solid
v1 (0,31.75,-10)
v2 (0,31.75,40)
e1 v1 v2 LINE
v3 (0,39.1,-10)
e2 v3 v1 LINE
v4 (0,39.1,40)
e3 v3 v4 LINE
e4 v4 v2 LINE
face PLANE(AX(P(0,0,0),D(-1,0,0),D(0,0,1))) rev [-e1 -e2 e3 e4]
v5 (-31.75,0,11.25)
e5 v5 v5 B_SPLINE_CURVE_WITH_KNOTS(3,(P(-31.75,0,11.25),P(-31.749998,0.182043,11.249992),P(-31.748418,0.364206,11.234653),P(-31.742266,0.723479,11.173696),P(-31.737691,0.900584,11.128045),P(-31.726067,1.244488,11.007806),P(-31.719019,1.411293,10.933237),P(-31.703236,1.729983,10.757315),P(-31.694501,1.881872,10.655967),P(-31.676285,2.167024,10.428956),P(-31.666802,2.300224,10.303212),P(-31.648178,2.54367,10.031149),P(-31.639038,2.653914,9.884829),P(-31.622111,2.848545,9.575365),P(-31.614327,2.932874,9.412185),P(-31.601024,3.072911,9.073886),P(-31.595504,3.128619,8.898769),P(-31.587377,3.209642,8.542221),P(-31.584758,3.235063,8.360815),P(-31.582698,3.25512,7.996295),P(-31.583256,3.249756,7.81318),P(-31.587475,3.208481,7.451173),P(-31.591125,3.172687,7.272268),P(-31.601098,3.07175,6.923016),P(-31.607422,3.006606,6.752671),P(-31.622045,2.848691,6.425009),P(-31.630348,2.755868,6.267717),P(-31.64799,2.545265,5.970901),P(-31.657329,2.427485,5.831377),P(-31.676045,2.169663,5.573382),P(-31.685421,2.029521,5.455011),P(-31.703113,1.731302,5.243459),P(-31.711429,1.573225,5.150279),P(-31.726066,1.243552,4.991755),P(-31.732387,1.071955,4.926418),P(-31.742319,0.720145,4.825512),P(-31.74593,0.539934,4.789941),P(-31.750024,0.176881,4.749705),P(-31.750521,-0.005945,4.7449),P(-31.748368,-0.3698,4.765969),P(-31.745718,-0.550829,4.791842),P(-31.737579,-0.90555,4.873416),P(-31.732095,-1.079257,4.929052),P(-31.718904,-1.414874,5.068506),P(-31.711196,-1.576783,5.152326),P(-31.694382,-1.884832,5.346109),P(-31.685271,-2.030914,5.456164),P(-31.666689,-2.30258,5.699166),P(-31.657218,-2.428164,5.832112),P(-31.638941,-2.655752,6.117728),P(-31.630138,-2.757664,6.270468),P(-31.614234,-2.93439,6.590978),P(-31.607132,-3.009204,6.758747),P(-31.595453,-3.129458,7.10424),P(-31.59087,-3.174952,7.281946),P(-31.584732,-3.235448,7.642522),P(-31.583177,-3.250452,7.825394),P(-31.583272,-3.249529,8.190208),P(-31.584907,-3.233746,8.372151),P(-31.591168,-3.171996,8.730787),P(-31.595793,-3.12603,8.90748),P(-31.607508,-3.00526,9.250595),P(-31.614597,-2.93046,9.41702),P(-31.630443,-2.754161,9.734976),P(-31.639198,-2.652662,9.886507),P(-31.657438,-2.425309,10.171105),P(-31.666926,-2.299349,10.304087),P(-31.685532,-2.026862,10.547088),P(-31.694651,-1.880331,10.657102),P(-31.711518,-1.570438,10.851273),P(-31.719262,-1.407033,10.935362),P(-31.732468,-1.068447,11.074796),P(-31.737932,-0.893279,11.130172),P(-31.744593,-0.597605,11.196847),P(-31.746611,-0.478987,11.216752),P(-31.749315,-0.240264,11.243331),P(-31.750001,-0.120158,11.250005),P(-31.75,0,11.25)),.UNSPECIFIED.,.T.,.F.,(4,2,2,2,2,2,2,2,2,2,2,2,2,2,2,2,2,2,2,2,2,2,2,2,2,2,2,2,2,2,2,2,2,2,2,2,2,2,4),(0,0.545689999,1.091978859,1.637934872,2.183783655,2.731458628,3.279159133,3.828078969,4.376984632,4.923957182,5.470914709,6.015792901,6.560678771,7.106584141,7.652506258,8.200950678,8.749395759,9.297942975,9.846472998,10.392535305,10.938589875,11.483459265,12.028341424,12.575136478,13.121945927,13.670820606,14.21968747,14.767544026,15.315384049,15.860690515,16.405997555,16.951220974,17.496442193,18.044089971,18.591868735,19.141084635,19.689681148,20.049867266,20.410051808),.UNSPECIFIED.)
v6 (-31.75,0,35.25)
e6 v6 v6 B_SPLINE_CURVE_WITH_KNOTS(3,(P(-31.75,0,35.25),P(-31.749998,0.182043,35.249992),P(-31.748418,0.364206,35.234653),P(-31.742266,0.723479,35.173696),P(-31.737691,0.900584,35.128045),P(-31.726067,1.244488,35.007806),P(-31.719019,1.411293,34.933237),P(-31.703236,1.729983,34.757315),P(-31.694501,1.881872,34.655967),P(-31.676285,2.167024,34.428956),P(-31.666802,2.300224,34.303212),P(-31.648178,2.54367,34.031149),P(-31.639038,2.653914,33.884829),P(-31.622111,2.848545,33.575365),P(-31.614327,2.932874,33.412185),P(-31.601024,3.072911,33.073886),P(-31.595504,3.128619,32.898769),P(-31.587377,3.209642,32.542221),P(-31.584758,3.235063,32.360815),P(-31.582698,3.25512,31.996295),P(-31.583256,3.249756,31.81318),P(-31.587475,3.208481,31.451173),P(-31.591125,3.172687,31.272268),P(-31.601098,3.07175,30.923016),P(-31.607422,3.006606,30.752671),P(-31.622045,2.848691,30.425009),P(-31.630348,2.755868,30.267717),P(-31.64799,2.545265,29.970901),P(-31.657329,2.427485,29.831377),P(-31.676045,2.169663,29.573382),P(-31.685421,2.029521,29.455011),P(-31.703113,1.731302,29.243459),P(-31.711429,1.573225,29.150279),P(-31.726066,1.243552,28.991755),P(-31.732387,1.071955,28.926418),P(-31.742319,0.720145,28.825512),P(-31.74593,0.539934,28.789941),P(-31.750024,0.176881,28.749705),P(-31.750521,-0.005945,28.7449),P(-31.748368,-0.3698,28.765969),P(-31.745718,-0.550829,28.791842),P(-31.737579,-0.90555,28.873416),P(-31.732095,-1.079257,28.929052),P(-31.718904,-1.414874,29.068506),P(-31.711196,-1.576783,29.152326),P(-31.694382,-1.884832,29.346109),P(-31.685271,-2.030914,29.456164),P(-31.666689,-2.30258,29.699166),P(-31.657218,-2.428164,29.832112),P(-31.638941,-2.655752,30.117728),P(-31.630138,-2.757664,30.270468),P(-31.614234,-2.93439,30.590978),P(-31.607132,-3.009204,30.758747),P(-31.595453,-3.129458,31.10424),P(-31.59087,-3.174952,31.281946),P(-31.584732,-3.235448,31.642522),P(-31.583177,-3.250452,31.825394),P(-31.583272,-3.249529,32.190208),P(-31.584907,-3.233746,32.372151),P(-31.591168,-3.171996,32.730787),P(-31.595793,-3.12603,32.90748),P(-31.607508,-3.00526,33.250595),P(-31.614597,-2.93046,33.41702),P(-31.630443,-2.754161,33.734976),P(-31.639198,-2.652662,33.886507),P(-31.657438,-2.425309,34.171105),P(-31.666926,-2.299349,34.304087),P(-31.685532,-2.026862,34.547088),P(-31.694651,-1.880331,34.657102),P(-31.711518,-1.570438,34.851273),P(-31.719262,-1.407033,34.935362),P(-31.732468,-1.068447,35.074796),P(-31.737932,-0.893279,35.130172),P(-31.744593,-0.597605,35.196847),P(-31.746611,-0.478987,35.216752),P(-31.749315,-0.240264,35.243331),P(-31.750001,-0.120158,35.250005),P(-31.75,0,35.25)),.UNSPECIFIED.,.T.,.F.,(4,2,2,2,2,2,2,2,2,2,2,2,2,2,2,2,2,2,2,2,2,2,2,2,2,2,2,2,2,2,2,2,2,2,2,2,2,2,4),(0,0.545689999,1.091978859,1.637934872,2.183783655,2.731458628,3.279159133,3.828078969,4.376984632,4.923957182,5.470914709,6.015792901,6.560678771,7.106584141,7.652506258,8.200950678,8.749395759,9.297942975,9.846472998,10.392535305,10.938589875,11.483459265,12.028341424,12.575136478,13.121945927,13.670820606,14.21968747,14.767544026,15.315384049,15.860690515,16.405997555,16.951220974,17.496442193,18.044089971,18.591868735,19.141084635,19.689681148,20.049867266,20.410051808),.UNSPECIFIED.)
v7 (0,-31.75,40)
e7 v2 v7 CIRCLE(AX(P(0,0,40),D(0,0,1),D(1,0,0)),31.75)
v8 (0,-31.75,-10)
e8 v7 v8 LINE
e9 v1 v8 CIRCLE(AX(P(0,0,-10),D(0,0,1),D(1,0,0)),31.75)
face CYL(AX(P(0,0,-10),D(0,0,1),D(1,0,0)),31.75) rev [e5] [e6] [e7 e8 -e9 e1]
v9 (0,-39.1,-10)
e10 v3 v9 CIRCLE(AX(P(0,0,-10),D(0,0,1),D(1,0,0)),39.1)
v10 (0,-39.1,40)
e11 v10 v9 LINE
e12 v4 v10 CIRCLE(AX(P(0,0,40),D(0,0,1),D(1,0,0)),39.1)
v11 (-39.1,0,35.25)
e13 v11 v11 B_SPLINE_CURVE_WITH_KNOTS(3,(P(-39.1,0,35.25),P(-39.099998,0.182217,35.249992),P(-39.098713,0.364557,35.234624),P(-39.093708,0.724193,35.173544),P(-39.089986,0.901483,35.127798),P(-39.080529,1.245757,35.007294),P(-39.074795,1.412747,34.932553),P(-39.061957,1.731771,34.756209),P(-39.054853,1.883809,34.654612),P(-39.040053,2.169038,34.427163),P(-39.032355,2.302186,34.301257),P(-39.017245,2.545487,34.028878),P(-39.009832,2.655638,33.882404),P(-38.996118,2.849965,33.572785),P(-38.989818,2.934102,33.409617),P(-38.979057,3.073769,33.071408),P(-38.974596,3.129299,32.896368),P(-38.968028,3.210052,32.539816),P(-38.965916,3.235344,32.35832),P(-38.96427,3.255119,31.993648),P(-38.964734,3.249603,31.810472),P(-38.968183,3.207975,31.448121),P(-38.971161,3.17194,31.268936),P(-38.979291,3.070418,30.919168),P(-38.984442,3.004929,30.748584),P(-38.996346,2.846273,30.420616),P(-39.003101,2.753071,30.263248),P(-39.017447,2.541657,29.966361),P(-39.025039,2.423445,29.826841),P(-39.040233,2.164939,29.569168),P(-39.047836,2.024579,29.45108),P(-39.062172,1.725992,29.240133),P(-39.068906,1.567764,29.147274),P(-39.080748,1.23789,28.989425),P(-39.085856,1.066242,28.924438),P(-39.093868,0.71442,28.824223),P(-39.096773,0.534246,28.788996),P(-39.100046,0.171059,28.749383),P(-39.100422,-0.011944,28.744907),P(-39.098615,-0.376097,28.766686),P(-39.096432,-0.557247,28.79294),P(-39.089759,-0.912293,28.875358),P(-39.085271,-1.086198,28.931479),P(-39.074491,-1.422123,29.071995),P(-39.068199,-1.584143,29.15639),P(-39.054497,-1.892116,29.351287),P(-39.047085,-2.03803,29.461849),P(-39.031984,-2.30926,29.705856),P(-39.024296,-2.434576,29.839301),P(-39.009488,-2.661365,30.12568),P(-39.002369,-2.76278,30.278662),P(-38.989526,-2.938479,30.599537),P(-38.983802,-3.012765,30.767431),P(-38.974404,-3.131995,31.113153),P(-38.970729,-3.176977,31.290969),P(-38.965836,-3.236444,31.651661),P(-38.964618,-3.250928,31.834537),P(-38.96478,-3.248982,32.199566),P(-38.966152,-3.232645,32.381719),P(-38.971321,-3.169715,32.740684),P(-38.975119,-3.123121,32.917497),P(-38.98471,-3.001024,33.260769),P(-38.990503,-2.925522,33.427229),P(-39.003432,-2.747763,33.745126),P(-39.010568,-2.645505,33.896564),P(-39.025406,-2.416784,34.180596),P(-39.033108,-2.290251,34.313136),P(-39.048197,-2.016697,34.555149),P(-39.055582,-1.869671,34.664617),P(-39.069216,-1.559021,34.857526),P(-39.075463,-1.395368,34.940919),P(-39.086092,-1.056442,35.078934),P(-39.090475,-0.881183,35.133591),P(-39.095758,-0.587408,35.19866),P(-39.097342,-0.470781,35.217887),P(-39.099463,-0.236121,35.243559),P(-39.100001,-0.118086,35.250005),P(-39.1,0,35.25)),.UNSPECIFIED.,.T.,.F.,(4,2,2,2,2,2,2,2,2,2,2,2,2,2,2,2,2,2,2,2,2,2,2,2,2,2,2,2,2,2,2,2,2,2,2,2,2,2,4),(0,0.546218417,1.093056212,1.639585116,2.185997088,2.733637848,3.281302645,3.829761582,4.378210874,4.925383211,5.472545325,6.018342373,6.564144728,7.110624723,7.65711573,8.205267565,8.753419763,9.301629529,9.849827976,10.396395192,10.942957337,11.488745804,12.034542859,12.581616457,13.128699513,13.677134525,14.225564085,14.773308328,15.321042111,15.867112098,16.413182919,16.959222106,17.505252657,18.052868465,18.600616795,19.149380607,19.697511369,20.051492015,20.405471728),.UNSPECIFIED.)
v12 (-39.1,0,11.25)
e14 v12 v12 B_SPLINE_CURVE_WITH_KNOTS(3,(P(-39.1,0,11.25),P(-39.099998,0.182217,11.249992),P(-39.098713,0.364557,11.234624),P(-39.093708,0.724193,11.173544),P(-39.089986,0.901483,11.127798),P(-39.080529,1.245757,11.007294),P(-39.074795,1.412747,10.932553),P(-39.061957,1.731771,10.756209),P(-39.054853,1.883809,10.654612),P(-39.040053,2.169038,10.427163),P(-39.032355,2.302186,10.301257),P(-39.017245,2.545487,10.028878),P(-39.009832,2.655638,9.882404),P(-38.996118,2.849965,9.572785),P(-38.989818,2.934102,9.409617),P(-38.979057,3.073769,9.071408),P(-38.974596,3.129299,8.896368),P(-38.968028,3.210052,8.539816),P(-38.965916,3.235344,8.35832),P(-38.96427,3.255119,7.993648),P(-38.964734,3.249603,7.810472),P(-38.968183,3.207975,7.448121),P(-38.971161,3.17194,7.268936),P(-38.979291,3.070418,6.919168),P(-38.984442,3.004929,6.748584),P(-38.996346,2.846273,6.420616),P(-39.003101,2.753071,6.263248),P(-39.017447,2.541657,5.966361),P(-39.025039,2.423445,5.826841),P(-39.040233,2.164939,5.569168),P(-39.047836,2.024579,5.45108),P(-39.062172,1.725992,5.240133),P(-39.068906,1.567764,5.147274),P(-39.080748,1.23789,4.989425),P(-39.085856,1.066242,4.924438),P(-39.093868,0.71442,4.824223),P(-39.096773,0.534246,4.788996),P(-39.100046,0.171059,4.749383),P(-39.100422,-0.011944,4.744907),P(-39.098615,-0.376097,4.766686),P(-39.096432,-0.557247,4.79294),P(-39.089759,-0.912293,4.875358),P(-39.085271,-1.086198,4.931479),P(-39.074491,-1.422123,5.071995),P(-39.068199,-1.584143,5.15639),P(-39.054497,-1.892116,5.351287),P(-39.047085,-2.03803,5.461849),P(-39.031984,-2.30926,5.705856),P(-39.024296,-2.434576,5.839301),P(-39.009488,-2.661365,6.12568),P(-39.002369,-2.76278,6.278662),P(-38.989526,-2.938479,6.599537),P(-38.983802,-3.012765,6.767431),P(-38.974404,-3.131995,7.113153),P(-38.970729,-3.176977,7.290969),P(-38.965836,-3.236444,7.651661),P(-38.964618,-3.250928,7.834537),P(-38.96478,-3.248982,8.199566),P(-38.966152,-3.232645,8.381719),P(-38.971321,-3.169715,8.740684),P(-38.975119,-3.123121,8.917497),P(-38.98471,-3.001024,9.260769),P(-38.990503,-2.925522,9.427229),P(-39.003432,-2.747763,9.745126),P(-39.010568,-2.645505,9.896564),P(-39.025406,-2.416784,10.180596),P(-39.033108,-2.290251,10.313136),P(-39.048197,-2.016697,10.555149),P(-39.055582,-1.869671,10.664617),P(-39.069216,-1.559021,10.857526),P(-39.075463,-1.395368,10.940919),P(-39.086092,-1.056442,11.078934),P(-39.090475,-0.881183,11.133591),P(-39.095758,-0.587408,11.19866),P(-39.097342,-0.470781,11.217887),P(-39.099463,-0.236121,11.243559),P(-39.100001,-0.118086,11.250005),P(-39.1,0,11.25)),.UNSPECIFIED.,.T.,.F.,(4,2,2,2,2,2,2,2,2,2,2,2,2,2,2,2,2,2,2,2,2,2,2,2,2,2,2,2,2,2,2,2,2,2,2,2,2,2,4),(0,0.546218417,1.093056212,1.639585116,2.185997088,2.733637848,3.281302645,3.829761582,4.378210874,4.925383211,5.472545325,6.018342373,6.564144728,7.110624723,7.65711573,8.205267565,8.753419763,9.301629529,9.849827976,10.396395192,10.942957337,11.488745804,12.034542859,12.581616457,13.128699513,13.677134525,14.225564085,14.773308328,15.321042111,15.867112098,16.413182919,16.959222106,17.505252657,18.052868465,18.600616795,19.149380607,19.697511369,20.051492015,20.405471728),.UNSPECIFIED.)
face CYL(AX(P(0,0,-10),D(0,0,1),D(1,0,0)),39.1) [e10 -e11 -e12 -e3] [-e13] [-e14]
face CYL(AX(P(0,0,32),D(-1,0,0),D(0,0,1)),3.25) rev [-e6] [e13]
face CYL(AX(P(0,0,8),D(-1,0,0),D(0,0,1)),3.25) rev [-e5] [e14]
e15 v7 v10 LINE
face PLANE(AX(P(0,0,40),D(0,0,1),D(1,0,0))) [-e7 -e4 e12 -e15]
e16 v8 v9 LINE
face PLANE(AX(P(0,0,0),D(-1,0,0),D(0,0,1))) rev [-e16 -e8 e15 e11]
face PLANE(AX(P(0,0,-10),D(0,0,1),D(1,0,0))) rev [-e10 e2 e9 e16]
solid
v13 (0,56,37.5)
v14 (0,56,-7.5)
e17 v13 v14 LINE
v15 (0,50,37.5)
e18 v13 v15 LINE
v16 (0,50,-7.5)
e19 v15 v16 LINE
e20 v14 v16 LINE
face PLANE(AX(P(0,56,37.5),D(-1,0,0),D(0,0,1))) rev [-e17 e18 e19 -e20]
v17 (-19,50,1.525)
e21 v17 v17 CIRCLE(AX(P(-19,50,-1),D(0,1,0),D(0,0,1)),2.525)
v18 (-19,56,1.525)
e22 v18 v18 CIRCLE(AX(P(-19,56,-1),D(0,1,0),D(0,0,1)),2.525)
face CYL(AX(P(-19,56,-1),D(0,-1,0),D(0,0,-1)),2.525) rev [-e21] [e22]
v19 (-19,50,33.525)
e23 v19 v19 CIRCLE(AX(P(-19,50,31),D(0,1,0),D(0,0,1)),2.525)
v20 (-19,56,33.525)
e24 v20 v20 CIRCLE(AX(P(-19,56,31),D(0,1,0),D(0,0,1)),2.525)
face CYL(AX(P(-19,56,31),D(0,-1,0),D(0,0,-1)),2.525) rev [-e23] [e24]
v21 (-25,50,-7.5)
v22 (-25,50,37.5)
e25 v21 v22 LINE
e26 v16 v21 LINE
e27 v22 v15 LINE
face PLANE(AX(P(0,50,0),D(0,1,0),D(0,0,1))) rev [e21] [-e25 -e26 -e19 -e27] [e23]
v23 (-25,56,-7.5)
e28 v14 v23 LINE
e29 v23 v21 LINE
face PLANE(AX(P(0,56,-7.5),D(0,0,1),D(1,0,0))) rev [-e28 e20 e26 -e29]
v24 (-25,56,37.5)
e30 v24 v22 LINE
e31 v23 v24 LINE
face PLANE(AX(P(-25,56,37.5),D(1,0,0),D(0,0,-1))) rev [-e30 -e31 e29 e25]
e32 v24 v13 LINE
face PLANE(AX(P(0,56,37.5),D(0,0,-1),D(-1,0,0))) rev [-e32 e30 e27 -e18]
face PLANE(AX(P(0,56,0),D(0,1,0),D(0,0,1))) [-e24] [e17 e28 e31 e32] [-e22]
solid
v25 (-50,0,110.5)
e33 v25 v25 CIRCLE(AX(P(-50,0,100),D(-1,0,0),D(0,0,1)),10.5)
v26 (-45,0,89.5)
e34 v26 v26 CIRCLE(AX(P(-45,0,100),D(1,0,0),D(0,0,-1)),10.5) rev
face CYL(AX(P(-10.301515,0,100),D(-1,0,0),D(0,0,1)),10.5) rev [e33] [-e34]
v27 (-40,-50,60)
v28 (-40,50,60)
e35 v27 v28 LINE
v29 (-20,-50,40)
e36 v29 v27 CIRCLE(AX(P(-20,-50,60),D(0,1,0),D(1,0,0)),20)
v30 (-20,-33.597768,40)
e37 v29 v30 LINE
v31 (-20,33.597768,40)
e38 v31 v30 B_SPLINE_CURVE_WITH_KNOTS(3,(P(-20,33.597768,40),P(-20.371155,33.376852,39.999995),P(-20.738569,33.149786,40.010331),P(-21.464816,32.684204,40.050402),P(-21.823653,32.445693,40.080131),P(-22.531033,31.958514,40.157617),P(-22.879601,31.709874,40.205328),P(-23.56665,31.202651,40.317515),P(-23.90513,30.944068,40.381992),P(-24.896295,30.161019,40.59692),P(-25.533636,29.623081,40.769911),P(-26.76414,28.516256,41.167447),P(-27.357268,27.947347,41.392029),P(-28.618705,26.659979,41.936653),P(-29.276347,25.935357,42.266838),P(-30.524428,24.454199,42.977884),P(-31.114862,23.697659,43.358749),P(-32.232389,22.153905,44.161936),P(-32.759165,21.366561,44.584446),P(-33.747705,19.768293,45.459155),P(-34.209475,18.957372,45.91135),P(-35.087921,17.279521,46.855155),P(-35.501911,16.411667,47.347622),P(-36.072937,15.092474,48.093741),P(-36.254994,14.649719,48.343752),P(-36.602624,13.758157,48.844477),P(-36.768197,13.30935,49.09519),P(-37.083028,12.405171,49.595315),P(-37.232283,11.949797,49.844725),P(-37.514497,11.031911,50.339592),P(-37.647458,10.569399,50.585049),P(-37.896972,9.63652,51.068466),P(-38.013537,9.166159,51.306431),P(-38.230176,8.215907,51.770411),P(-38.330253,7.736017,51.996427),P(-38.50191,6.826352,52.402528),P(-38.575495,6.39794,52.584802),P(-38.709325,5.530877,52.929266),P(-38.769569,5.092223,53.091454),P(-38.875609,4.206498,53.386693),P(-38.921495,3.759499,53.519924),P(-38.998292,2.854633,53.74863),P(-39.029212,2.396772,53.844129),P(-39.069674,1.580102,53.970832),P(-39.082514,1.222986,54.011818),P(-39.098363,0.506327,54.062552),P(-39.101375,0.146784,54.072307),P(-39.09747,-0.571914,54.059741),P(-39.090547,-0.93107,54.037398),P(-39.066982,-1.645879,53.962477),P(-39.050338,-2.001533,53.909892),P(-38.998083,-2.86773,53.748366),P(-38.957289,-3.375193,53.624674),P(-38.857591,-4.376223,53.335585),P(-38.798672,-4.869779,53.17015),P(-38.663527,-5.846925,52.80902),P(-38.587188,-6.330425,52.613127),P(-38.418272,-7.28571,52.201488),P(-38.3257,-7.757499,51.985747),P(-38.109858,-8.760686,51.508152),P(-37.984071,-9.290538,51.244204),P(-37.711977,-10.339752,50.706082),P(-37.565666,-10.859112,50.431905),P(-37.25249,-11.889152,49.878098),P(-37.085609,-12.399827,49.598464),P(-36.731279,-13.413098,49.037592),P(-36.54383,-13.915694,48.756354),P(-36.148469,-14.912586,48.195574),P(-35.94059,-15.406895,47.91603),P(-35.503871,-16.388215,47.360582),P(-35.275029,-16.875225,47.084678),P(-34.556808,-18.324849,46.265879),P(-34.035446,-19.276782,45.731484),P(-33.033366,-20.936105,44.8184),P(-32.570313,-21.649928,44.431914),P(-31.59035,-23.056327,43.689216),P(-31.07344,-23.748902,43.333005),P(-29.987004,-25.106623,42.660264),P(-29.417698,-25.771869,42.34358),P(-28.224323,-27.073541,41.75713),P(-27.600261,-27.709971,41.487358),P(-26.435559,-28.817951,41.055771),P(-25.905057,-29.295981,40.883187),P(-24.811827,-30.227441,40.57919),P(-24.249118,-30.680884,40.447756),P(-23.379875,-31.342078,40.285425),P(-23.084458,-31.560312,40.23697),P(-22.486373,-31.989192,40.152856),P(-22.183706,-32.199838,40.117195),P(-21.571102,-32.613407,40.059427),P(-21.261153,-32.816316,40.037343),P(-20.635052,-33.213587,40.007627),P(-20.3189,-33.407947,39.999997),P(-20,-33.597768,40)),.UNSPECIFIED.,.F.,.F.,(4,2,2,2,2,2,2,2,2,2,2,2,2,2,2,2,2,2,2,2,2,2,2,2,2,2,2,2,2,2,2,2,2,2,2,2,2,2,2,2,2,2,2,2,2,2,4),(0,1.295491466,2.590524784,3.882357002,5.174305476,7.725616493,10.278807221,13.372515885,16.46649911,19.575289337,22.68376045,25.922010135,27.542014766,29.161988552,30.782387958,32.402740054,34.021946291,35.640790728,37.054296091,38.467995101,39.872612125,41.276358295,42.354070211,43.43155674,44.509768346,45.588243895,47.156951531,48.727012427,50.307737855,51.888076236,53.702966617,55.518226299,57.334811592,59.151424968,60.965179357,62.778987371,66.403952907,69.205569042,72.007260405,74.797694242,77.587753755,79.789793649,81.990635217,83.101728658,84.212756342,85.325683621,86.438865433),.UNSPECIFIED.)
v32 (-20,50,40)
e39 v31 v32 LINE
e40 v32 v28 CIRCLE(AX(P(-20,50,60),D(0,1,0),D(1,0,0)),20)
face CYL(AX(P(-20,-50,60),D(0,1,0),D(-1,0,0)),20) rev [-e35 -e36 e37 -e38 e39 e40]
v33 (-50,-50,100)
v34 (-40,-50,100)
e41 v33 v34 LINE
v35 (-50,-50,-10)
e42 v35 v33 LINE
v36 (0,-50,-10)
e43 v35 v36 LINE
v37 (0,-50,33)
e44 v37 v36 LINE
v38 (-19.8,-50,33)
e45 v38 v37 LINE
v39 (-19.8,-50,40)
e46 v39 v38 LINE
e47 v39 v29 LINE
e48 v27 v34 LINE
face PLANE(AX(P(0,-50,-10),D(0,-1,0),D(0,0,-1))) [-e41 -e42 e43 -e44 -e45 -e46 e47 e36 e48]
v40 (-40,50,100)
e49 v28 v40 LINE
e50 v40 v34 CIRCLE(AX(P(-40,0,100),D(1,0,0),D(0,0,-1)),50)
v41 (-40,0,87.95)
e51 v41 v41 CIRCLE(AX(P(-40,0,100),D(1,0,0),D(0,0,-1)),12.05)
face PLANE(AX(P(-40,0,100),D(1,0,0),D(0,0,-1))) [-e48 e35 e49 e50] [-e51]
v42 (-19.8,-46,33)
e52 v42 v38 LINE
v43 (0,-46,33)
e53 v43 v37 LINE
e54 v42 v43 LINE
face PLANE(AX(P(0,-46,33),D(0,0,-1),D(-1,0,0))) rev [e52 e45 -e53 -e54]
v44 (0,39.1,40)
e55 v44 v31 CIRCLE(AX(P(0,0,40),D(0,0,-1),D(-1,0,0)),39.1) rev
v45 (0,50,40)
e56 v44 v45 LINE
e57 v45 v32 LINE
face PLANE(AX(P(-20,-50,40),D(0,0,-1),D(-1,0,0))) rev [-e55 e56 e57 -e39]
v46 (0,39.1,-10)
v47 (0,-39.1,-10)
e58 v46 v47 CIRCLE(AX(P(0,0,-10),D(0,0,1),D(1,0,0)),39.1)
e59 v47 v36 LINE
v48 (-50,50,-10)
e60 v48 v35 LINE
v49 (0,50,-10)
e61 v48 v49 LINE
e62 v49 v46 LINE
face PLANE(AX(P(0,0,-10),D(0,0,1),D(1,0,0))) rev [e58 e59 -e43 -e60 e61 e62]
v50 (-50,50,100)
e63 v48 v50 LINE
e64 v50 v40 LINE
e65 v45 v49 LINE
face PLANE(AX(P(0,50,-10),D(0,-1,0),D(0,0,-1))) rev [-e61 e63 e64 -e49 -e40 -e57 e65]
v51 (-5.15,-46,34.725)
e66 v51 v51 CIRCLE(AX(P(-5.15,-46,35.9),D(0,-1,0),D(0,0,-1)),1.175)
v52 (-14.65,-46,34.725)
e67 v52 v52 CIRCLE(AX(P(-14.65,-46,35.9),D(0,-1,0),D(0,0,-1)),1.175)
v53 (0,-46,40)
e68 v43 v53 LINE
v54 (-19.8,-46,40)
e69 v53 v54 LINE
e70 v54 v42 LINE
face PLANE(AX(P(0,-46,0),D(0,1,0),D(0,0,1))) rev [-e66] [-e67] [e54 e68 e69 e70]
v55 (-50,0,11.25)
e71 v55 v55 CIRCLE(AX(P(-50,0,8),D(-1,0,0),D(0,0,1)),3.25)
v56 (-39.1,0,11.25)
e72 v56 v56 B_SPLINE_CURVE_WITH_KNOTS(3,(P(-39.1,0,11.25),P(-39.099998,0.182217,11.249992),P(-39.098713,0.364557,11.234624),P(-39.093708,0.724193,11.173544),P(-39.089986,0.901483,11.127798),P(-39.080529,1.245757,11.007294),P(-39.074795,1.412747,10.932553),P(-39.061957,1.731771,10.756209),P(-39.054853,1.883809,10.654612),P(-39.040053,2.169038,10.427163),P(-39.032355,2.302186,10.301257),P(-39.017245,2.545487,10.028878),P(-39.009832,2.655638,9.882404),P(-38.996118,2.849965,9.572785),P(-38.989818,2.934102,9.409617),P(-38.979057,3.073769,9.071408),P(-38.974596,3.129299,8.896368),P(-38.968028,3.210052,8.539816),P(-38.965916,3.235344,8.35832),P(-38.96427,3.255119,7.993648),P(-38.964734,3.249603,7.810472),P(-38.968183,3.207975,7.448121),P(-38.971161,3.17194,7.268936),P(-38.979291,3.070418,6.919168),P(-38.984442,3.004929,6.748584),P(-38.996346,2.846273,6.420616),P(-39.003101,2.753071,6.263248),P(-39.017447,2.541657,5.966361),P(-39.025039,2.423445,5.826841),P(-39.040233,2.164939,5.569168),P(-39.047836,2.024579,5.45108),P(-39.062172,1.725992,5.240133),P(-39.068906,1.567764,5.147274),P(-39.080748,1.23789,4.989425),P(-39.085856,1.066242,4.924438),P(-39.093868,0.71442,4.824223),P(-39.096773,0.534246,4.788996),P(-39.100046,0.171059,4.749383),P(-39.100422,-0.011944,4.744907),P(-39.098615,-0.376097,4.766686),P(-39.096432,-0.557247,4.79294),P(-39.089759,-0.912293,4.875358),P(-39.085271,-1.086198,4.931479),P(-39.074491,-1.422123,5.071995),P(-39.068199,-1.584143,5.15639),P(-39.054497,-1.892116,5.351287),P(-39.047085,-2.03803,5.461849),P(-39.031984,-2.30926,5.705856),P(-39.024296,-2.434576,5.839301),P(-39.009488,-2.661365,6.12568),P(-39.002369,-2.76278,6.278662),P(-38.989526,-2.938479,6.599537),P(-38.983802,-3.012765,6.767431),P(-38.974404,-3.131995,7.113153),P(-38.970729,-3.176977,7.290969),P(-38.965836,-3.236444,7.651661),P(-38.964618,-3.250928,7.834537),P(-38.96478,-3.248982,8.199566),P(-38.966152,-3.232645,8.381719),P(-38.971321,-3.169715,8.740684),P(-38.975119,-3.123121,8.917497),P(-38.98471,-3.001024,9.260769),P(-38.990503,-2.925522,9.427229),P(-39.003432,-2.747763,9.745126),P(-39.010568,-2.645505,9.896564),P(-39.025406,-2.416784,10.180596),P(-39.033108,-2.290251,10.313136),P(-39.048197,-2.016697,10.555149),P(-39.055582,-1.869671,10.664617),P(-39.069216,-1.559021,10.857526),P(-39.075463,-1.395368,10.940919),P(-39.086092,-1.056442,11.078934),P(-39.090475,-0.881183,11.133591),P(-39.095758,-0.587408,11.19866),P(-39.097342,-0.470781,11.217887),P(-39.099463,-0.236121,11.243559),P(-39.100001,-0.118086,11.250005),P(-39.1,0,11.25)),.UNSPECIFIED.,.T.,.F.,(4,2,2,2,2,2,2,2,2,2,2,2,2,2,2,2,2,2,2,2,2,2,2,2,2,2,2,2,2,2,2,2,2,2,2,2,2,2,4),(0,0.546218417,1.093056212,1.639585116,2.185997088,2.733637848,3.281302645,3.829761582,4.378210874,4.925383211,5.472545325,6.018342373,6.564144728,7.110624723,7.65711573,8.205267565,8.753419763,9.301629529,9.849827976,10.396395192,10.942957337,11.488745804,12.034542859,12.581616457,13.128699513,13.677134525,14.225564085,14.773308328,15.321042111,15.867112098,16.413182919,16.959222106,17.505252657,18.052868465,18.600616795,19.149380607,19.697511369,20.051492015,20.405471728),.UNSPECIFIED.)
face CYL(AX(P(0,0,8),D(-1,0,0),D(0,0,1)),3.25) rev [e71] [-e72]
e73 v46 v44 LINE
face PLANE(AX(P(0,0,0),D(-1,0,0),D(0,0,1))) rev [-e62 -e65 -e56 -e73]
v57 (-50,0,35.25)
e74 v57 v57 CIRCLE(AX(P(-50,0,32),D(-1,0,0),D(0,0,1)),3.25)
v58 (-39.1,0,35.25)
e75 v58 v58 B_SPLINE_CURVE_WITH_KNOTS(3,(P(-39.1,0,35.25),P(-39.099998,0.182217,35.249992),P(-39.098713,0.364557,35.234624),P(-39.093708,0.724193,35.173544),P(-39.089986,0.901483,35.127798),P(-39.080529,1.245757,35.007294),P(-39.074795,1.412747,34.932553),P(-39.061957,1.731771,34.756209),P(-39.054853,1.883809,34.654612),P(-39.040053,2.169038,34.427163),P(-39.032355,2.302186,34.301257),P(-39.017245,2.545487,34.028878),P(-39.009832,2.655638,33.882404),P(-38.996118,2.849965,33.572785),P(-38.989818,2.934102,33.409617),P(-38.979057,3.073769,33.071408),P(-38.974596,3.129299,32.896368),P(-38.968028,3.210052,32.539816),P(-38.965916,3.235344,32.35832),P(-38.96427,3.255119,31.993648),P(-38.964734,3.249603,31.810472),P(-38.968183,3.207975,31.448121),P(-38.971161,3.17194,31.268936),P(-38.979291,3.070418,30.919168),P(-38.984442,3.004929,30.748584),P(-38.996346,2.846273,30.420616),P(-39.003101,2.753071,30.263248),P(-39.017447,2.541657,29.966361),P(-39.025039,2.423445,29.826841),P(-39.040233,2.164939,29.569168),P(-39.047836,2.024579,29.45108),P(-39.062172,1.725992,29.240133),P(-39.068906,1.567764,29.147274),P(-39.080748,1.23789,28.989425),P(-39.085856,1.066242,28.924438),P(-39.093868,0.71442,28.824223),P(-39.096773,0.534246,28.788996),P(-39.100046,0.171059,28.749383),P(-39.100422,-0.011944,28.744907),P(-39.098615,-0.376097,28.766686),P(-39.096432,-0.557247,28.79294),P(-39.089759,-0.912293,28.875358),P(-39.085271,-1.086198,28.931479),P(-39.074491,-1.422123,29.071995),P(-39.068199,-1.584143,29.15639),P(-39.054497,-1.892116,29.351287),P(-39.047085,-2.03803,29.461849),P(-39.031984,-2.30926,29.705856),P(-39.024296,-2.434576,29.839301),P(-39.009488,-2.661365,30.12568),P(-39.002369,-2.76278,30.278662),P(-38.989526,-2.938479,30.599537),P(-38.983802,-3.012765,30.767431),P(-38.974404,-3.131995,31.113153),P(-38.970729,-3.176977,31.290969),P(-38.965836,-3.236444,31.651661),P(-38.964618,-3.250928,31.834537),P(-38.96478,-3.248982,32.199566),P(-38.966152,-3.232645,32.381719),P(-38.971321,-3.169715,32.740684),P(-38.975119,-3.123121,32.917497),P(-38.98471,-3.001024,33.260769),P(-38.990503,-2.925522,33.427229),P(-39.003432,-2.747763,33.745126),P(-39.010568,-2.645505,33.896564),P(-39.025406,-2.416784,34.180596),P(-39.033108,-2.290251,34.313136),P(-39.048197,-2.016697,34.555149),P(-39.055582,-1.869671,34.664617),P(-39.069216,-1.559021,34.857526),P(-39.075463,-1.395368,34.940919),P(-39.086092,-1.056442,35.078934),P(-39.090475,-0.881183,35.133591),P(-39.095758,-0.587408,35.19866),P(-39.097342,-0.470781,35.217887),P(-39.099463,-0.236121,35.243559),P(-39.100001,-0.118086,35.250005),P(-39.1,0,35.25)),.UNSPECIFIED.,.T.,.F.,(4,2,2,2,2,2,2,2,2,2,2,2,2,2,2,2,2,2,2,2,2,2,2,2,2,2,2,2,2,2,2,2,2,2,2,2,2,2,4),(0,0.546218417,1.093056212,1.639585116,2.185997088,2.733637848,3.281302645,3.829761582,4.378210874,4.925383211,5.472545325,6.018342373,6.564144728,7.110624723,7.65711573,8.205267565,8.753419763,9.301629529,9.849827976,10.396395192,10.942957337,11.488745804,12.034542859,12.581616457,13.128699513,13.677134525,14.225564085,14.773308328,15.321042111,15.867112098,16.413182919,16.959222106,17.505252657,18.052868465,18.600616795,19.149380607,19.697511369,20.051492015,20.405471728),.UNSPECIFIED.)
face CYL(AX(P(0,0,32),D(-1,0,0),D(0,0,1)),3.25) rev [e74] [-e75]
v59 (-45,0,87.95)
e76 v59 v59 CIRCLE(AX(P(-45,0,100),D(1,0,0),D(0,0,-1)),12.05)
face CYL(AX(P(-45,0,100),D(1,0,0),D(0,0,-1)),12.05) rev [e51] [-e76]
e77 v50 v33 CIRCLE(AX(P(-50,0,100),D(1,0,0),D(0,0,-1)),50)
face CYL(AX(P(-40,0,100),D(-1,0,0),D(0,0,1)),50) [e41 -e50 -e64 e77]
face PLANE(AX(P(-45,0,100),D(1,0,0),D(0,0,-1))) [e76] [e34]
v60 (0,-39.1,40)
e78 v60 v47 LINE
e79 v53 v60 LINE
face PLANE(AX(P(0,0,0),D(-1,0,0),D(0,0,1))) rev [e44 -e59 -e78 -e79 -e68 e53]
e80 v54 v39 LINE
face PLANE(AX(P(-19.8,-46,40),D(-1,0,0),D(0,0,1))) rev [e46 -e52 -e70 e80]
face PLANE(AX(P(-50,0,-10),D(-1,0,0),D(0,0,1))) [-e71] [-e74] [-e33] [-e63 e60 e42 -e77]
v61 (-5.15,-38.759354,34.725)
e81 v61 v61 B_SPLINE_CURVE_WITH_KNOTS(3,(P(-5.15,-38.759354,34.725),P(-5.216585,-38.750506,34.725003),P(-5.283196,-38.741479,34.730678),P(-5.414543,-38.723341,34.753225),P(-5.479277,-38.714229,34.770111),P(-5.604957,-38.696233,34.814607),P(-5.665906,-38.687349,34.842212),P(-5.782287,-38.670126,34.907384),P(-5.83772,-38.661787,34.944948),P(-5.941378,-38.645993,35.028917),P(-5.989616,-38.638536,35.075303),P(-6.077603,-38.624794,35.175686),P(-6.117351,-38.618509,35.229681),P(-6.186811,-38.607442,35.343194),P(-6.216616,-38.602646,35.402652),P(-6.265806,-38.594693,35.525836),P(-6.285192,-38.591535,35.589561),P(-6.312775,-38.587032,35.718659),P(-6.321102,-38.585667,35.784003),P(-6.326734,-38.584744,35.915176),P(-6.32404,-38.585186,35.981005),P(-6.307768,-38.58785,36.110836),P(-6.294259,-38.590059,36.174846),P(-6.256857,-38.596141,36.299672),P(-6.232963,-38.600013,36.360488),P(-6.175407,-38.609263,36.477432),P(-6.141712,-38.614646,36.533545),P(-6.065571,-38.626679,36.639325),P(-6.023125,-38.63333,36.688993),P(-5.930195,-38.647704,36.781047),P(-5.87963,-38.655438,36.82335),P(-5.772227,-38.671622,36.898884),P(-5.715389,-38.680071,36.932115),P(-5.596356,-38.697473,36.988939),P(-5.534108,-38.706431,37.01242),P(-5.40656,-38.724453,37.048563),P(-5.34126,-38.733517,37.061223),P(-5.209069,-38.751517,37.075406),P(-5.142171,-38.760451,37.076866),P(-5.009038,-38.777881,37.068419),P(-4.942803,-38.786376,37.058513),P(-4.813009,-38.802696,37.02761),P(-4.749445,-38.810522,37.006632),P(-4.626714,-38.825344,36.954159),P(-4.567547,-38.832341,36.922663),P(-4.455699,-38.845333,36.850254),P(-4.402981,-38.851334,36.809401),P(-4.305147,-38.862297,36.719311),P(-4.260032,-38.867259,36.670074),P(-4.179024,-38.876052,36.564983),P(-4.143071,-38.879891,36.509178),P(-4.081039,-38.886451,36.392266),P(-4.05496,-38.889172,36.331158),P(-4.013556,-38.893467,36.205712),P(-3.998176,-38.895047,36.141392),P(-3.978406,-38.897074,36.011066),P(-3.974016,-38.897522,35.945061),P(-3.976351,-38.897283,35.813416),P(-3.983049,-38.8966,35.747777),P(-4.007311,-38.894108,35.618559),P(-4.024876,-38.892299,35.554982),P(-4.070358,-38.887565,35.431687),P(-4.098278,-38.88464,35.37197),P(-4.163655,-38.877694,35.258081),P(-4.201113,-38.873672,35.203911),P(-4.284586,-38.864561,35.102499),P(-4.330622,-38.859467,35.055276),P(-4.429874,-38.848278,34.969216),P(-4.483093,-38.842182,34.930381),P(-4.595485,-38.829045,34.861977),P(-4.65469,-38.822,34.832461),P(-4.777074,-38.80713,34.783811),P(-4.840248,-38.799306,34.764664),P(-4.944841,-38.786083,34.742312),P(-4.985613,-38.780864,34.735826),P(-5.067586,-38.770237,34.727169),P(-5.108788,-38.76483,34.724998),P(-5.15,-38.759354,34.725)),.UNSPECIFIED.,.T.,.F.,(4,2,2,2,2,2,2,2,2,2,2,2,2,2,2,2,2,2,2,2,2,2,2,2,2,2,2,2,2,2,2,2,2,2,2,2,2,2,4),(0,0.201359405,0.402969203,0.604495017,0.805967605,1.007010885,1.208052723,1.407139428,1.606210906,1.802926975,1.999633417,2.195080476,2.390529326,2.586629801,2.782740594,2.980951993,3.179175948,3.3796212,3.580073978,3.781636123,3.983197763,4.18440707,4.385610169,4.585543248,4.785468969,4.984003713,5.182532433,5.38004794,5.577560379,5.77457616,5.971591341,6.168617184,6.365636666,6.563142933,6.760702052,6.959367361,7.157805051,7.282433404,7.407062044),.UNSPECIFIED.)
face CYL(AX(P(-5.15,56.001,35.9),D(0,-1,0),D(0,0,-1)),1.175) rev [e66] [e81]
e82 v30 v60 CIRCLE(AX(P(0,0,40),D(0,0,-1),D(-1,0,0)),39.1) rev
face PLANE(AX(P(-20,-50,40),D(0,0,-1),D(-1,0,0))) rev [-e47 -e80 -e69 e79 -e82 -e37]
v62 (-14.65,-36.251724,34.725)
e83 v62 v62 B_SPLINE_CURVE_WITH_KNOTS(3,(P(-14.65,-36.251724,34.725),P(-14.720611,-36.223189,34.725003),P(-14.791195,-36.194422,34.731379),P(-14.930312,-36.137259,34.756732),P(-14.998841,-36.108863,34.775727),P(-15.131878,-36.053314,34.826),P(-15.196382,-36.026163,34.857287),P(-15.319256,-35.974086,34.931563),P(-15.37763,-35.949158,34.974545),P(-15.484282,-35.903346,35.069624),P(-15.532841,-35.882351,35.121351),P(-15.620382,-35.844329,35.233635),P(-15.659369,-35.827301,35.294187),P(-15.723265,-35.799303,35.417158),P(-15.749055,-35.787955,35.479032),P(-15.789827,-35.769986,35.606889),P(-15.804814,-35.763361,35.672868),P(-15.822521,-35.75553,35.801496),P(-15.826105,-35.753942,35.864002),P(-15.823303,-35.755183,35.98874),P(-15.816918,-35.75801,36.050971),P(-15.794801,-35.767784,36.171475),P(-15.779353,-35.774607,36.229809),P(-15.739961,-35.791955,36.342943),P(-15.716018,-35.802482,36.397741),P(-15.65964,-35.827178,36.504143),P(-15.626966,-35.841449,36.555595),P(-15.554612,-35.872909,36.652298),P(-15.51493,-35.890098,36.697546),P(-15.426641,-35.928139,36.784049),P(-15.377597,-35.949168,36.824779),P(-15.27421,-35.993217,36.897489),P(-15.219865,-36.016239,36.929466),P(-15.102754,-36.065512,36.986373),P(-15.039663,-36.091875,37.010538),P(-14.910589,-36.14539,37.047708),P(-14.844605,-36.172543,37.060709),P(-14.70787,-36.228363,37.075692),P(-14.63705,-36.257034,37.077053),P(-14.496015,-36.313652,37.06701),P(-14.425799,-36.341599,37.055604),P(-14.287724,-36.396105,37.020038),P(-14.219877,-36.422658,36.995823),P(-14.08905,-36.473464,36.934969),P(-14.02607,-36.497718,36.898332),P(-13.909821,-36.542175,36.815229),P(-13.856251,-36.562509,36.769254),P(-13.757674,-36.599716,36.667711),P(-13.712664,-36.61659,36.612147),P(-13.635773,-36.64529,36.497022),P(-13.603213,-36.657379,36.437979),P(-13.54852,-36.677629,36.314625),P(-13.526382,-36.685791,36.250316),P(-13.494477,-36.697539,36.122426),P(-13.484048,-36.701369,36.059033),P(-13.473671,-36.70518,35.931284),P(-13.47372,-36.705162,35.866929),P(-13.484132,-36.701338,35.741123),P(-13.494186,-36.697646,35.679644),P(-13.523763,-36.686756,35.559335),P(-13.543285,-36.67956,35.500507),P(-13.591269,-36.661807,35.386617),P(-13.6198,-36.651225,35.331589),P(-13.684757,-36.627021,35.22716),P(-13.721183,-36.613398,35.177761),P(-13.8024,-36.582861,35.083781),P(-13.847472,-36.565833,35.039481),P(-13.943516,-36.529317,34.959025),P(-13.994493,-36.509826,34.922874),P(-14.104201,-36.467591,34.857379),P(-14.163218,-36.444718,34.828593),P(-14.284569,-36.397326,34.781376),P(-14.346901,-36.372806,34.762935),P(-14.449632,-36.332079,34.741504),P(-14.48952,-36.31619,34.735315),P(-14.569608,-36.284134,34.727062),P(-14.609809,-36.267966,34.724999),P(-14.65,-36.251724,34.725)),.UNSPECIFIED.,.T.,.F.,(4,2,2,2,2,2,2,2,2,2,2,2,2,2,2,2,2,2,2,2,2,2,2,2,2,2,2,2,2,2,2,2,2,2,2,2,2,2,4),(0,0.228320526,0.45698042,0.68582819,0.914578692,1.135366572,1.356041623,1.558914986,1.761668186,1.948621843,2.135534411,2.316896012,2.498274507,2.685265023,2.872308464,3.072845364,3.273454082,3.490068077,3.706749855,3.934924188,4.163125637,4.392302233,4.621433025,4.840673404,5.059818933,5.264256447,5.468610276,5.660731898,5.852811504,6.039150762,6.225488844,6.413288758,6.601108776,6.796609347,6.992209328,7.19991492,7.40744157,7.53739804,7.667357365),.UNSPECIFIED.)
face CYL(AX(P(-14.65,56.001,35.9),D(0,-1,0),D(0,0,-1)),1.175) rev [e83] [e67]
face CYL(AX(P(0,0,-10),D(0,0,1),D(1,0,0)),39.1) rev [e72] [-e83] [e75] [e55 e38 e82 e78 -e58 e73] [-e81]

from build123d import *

# Parameters (mm, degrees)
CENTRE_HOLE_FOR_L2_DEPTH      = 40
CENTRE_HOLE_FOR_L2_DEPTH_BACK = 10
SKETCH1_R                     = 39.1
SKETCH1_R_2                   = 31.75
MAIN_STRUCTURE_DEPTH          = 60
MAIN_STRUCTURE_DEPTH_BACK     = 50
SKETCH2_W                     = 100
SKETCH2_H                     = 100
SKETCH2_R                     = 39.1
BEARING_CURVE_DEPTH           = 10
SHAFT_START                   = -10
SHAFT_HOLE_OUTLINE_R          = 10.5
SHAFT_HOLE_DEPTH              = 10
WRIST_CUTOUT_DEPTH            = 188.082869339
SKETCH9_R                     = 12.05
BEARING_DEPTH                 = 5
SURFACECUT1_OUTLINE_R         = 10.5
SURFACECUT1_DEPTH             = 50
SKETCH11_W                    = 25
SKETCH11_H                    = 45
SKETCH11_R                    = 2.525
BOSS_EXTRUDE1_DEPTH           = 6
SKETCH15_W                    = 19.8
SKETCH15_H                    = 7
CUT_EXTRUDE4_DEPTH            = 4
CUT_EXTRUDE5_REACH            = 190.16
CUT_EXTRUDE5_END_RADIUS       = 39.1
SKETCH16_R                    = 1.175
CUT_EXTRUDE6_DEPTH            = 168.7378908
CUT_EXTRUDE6_DEPTH_BACK       = 168.7378908
SKETCH18_R                    = 3.25


# Read off the part's stored shape, not the designer's step: Shaft Hole, SurfaceCut1
with BuildPart() as part:
    # Sketch1 → Centre Hole for L2 (new, two sides: drawn at the far end of the back side and taken through both)
    with BuildSketch(Plane.XY.offset(-CENTRE_HOLE_FOR_L2_DEPTH_BACK)):
        Circle(SKETCH1_R)
        Circle(SKETCH1_R_2, mode=Mode.SUBTRACT)
    extrude(amount=CENTRE_HOLE_FOR_L2_DEPTH + CENTRE_HOLE_FOR_L2_DEPTH_BACK)


with BuildPart() as body_2:
    # Sketch2 → Main Structure (new, two sides: drawn at the far end of the back side and taken through both)
    with BuildSketch(Plane.XY.offset(40).offset(-MAIN_STRUCTURE_DEPTH_BACK)):
        Rectangle(SKETCH2_W, SKETCH2_H)
        Circle(SKETCH2_R, mode=Mode.SUBTRACT)
    extrude(amount=MAIN_STRUCTURE_DEPTH + MAIN_STRUCTURE_DEPTH_BACK)

    # Sketch3 → Bearing Curve (add)
    with BuildSketch(Plane.ZY.offset(50)):
        with BuildLine():
            Line((100, 50), (100, -50))
            ThreePointArc((100, -50), (150, 0), (100, 50))
        make_face()
    bearing_curve = extrude(amount=-BEARING_CURVE_DEPTH)

    # Upright Mirror: Bearing Curve across plane
    add(bearing_curve.mirror(Plane(origin=(0, 0, 0), x_dir=(0, 0, 1), z_dir=(1, 0, 0))))

    # Shaft Hole outline → Shaft Hole (cut)
    with BuildSketch(Plane.ZY.offset(50).offset(SHAFT_START)):
        with Locations((100, 0)):
            Circle(SHAFT_HOLE_OUTLINE_R)
    shaft_hole = extrude(amount=SHAFT_HOLE_DEPTH, mode=Mode.SUBTRACT)

    # Sketch4 → Wrist Cutout (cut, through all)
    with BuildSketch(Plane(origin=(0, 50, 0), x_dir=(1, 0, 0), z_dir=(0, 1, 0))):
        with BuildLine():
            Line((-40, -100), (-40, -60))
            ThreePointArc((-40, -60), (-34.142135624, -45.857864376), (-20, -40))
            Line((-20, -40), (20, -40))
            ThreePointArc((20, -40), (34.142135624, -45.857864376), (40, -60))
            Line((40, -60), (40, -100))
            Line((40, -100), (-40, -100))
        make_face()
    extrude(amount=-WRIST_CUTOUT_DEPTH, mode=Mode.SUBTRACT)

    # Sketch9 → Bearing (cut)
    with BuildSketch(Plane(origin=(-40, 0, 0), x_dir=(0, 0, -1), z_dir=(1, 0, 0))):
        with Locations((-100, 0)):
            Circle(SKETCH9_R)
    bearing = extrude(amount=-BEARING_DEPTH, mode=Mode.SUBTRACT)

    # Bearing Mirror: Shaft Hole, Bearing across plane
    add(shaft_hole.mirror(Plane(origin=(0, 0, 0), x_dir=(0, 0, 1), z_dir=(1, 0, 0))), mode=Mode.SUBTRACT)
    add(bearing.mirror(Plane(origin=(0, 0, 0), x_dir=(0, 0, 1), z_dir=(1, 0, 0))), mode=Mode.SUBTRACT)


with BuildPart() as surfacecut1_tool:
    # SurfaceCut1 outline → SurfaceCut1 (new body)
    with BuildSketch(Plane.YZ):
        with BuildLine():
            ThreePointArc((50, 100), (0, 150), (-50, 100))
            Line((-50, 100), (-50, -10))
            Line((-50, -10), (50, -10))
            Line((50, -10), (50, 100))
        make_face()
        with Locations((0, 100)):
            Circle(SURFACECUT1_OUTLINE_R, mode=Mode.SUBTRACT)
    extrude(amount=SURFACECUT1_DEPTH)


with BuildPart() as part_1:
    add(part.part)

    # SurfaceCut1: cut by surfacecut1_tool
    add(surfacecut1_tool.part, mode=Mode.SUBTRACT)


with BuildPart() as body_2_1:
    add(body_2.part)

    # SurfaceCut1: cut by surfacecut1_tool
    add(surfacecut1_tool.part, mode=Mode.SUBTRACT)

    # Sketch15 → Cut-Extrude4 (cut)
    with BuildSketch(Plane(origin=(0, -50, 0), x_dir=(-1, 0, 0), z_dir=(0, -1, 0))):
        with Locations((9.9, -36.5)):
            Rectangle(SKETCH15_W, SKETCH15_H)
    extrude(amount=-CUT_EXTRUDE4_DEPTH, mode=Mode.SUBTRACT)

    # Cut-Extrude5: up to this cylinder (the profile starts outside it)
    cut_extrude5_end = Plane(origin=(0, 0, 35.9), z_dir=(0, 0, 1)) * Cylinder(CUT_EXTRUDE5_END_RADIUS, 459.52, mode=Mode.PRIVATE)
    # Sketch16 → Cut-Extrude5 (cut, up to the surface)
    with BuildSketch(Plane(origin=(0, -46, 0), x_dir=(-1, 0, 0), z_dir=(0, -1, 0)), mode=Mode.PRIVATE) as cut_extrude5_sk1:
        with Locations(Location((14.65, -35.9, 0), (0, 0, 90))):
            Circle(SKETCH16_R)
    cut_extrude5_tool1 = extrude(cut_extrude5_sk1.sketch, amount=-CUT_EXTRUDE5_REACH, mode=Mode.PRIVATE) - cut_extrude5_end
    add(cut_extrude5_tool1.solids().sort_by_distance((-14.65, -46, 35.9))[0], mode=Mode.SUBTRACT)
    # Sketch16 → Cut-Extrude5 (cut, up to the surface)
    with BuildSketch(Plane(origin=(0, -46, 0), x_dir=(-1, 0, 0), z_dir=(0, -1, 0)), mode=Mode.PRIVATE) as cut_extrude5_sk2:
        with Locations(Location((5.15, -35.9, 0), (0, 0, 90))):
            Circle(SKETCH16_R)
    cut_extrude5_tool2 = extrude(cut_extrude5_sk2.sketch, amount=-CUT_EXTRUDE5_REACH, mode=Mode.PRIVATE) - cut_extrude5_end
    add(cut_extrude5_tool2.solids().sort_by_distance((-5.15, -46, 35.9))[0], mode=Mode.SUBTRACT)


with BuildPart() as body_3:
    # Sketch11 → Boss-Extrude1 (new body)
    with BuildSketch(Plane(origin=(0, 50, 0), x_dir=(1, 0, 0), z_dir=(0, 1, 0))):
        with Locations((-12.5, -15)):
            Rectangle(SKETCH11_W, SKETCH11_H)
        with Locations(Location((-19, 1, 0), (0, 0, 270))):
            Circle(SKETCH11_R, mode=Mode.SUBTRACT)
        with Locations(Location((-19, -31, 0), (0, 0, 270))):
            Circle(SKETCH11_R, mode=Mode.SUBTRACT)
    extrude(amount=BOSS_EXTRUDE1_DEPTH)


with BuildPart() as cut_extrude6_tool:
    # Sketch18 → Cut-Extrude6 (new, two sides: drawn at the far end of the back side and taken through both)
    with BuildSketch(Plane.ZY.offset(50).offset(-CUT_EXTRUDE6_DEPTH_BACK)):
        with Locations((8, 0)):
            Circle(SKETCH18_R)
        with Locations((32, 0)):
            Circle(SKETCH18_R)
    extrude(amount=CUT_EXTRUDE6_DEPTH + CUT_EXTRUDE6_DEPTH_BACK)


with BuildPart() as part_2:
    add(part_1.part)

    # Cut-Extrude6: cut by cut_extrude6_tool
    add(cut_extrude6_tool.part, mode=Mode.SUBTRACT)


with BuildPart() as body_2_2:
    add(body_2_1.part)

    # Cut-Extrude6: cut by cut_extrude6_tool
    add(cut_extrude6_tool.part, mode=Mode.SUBTRACT)


solid = Compound([body_3.part, part_2.part, body_2_2.part])
